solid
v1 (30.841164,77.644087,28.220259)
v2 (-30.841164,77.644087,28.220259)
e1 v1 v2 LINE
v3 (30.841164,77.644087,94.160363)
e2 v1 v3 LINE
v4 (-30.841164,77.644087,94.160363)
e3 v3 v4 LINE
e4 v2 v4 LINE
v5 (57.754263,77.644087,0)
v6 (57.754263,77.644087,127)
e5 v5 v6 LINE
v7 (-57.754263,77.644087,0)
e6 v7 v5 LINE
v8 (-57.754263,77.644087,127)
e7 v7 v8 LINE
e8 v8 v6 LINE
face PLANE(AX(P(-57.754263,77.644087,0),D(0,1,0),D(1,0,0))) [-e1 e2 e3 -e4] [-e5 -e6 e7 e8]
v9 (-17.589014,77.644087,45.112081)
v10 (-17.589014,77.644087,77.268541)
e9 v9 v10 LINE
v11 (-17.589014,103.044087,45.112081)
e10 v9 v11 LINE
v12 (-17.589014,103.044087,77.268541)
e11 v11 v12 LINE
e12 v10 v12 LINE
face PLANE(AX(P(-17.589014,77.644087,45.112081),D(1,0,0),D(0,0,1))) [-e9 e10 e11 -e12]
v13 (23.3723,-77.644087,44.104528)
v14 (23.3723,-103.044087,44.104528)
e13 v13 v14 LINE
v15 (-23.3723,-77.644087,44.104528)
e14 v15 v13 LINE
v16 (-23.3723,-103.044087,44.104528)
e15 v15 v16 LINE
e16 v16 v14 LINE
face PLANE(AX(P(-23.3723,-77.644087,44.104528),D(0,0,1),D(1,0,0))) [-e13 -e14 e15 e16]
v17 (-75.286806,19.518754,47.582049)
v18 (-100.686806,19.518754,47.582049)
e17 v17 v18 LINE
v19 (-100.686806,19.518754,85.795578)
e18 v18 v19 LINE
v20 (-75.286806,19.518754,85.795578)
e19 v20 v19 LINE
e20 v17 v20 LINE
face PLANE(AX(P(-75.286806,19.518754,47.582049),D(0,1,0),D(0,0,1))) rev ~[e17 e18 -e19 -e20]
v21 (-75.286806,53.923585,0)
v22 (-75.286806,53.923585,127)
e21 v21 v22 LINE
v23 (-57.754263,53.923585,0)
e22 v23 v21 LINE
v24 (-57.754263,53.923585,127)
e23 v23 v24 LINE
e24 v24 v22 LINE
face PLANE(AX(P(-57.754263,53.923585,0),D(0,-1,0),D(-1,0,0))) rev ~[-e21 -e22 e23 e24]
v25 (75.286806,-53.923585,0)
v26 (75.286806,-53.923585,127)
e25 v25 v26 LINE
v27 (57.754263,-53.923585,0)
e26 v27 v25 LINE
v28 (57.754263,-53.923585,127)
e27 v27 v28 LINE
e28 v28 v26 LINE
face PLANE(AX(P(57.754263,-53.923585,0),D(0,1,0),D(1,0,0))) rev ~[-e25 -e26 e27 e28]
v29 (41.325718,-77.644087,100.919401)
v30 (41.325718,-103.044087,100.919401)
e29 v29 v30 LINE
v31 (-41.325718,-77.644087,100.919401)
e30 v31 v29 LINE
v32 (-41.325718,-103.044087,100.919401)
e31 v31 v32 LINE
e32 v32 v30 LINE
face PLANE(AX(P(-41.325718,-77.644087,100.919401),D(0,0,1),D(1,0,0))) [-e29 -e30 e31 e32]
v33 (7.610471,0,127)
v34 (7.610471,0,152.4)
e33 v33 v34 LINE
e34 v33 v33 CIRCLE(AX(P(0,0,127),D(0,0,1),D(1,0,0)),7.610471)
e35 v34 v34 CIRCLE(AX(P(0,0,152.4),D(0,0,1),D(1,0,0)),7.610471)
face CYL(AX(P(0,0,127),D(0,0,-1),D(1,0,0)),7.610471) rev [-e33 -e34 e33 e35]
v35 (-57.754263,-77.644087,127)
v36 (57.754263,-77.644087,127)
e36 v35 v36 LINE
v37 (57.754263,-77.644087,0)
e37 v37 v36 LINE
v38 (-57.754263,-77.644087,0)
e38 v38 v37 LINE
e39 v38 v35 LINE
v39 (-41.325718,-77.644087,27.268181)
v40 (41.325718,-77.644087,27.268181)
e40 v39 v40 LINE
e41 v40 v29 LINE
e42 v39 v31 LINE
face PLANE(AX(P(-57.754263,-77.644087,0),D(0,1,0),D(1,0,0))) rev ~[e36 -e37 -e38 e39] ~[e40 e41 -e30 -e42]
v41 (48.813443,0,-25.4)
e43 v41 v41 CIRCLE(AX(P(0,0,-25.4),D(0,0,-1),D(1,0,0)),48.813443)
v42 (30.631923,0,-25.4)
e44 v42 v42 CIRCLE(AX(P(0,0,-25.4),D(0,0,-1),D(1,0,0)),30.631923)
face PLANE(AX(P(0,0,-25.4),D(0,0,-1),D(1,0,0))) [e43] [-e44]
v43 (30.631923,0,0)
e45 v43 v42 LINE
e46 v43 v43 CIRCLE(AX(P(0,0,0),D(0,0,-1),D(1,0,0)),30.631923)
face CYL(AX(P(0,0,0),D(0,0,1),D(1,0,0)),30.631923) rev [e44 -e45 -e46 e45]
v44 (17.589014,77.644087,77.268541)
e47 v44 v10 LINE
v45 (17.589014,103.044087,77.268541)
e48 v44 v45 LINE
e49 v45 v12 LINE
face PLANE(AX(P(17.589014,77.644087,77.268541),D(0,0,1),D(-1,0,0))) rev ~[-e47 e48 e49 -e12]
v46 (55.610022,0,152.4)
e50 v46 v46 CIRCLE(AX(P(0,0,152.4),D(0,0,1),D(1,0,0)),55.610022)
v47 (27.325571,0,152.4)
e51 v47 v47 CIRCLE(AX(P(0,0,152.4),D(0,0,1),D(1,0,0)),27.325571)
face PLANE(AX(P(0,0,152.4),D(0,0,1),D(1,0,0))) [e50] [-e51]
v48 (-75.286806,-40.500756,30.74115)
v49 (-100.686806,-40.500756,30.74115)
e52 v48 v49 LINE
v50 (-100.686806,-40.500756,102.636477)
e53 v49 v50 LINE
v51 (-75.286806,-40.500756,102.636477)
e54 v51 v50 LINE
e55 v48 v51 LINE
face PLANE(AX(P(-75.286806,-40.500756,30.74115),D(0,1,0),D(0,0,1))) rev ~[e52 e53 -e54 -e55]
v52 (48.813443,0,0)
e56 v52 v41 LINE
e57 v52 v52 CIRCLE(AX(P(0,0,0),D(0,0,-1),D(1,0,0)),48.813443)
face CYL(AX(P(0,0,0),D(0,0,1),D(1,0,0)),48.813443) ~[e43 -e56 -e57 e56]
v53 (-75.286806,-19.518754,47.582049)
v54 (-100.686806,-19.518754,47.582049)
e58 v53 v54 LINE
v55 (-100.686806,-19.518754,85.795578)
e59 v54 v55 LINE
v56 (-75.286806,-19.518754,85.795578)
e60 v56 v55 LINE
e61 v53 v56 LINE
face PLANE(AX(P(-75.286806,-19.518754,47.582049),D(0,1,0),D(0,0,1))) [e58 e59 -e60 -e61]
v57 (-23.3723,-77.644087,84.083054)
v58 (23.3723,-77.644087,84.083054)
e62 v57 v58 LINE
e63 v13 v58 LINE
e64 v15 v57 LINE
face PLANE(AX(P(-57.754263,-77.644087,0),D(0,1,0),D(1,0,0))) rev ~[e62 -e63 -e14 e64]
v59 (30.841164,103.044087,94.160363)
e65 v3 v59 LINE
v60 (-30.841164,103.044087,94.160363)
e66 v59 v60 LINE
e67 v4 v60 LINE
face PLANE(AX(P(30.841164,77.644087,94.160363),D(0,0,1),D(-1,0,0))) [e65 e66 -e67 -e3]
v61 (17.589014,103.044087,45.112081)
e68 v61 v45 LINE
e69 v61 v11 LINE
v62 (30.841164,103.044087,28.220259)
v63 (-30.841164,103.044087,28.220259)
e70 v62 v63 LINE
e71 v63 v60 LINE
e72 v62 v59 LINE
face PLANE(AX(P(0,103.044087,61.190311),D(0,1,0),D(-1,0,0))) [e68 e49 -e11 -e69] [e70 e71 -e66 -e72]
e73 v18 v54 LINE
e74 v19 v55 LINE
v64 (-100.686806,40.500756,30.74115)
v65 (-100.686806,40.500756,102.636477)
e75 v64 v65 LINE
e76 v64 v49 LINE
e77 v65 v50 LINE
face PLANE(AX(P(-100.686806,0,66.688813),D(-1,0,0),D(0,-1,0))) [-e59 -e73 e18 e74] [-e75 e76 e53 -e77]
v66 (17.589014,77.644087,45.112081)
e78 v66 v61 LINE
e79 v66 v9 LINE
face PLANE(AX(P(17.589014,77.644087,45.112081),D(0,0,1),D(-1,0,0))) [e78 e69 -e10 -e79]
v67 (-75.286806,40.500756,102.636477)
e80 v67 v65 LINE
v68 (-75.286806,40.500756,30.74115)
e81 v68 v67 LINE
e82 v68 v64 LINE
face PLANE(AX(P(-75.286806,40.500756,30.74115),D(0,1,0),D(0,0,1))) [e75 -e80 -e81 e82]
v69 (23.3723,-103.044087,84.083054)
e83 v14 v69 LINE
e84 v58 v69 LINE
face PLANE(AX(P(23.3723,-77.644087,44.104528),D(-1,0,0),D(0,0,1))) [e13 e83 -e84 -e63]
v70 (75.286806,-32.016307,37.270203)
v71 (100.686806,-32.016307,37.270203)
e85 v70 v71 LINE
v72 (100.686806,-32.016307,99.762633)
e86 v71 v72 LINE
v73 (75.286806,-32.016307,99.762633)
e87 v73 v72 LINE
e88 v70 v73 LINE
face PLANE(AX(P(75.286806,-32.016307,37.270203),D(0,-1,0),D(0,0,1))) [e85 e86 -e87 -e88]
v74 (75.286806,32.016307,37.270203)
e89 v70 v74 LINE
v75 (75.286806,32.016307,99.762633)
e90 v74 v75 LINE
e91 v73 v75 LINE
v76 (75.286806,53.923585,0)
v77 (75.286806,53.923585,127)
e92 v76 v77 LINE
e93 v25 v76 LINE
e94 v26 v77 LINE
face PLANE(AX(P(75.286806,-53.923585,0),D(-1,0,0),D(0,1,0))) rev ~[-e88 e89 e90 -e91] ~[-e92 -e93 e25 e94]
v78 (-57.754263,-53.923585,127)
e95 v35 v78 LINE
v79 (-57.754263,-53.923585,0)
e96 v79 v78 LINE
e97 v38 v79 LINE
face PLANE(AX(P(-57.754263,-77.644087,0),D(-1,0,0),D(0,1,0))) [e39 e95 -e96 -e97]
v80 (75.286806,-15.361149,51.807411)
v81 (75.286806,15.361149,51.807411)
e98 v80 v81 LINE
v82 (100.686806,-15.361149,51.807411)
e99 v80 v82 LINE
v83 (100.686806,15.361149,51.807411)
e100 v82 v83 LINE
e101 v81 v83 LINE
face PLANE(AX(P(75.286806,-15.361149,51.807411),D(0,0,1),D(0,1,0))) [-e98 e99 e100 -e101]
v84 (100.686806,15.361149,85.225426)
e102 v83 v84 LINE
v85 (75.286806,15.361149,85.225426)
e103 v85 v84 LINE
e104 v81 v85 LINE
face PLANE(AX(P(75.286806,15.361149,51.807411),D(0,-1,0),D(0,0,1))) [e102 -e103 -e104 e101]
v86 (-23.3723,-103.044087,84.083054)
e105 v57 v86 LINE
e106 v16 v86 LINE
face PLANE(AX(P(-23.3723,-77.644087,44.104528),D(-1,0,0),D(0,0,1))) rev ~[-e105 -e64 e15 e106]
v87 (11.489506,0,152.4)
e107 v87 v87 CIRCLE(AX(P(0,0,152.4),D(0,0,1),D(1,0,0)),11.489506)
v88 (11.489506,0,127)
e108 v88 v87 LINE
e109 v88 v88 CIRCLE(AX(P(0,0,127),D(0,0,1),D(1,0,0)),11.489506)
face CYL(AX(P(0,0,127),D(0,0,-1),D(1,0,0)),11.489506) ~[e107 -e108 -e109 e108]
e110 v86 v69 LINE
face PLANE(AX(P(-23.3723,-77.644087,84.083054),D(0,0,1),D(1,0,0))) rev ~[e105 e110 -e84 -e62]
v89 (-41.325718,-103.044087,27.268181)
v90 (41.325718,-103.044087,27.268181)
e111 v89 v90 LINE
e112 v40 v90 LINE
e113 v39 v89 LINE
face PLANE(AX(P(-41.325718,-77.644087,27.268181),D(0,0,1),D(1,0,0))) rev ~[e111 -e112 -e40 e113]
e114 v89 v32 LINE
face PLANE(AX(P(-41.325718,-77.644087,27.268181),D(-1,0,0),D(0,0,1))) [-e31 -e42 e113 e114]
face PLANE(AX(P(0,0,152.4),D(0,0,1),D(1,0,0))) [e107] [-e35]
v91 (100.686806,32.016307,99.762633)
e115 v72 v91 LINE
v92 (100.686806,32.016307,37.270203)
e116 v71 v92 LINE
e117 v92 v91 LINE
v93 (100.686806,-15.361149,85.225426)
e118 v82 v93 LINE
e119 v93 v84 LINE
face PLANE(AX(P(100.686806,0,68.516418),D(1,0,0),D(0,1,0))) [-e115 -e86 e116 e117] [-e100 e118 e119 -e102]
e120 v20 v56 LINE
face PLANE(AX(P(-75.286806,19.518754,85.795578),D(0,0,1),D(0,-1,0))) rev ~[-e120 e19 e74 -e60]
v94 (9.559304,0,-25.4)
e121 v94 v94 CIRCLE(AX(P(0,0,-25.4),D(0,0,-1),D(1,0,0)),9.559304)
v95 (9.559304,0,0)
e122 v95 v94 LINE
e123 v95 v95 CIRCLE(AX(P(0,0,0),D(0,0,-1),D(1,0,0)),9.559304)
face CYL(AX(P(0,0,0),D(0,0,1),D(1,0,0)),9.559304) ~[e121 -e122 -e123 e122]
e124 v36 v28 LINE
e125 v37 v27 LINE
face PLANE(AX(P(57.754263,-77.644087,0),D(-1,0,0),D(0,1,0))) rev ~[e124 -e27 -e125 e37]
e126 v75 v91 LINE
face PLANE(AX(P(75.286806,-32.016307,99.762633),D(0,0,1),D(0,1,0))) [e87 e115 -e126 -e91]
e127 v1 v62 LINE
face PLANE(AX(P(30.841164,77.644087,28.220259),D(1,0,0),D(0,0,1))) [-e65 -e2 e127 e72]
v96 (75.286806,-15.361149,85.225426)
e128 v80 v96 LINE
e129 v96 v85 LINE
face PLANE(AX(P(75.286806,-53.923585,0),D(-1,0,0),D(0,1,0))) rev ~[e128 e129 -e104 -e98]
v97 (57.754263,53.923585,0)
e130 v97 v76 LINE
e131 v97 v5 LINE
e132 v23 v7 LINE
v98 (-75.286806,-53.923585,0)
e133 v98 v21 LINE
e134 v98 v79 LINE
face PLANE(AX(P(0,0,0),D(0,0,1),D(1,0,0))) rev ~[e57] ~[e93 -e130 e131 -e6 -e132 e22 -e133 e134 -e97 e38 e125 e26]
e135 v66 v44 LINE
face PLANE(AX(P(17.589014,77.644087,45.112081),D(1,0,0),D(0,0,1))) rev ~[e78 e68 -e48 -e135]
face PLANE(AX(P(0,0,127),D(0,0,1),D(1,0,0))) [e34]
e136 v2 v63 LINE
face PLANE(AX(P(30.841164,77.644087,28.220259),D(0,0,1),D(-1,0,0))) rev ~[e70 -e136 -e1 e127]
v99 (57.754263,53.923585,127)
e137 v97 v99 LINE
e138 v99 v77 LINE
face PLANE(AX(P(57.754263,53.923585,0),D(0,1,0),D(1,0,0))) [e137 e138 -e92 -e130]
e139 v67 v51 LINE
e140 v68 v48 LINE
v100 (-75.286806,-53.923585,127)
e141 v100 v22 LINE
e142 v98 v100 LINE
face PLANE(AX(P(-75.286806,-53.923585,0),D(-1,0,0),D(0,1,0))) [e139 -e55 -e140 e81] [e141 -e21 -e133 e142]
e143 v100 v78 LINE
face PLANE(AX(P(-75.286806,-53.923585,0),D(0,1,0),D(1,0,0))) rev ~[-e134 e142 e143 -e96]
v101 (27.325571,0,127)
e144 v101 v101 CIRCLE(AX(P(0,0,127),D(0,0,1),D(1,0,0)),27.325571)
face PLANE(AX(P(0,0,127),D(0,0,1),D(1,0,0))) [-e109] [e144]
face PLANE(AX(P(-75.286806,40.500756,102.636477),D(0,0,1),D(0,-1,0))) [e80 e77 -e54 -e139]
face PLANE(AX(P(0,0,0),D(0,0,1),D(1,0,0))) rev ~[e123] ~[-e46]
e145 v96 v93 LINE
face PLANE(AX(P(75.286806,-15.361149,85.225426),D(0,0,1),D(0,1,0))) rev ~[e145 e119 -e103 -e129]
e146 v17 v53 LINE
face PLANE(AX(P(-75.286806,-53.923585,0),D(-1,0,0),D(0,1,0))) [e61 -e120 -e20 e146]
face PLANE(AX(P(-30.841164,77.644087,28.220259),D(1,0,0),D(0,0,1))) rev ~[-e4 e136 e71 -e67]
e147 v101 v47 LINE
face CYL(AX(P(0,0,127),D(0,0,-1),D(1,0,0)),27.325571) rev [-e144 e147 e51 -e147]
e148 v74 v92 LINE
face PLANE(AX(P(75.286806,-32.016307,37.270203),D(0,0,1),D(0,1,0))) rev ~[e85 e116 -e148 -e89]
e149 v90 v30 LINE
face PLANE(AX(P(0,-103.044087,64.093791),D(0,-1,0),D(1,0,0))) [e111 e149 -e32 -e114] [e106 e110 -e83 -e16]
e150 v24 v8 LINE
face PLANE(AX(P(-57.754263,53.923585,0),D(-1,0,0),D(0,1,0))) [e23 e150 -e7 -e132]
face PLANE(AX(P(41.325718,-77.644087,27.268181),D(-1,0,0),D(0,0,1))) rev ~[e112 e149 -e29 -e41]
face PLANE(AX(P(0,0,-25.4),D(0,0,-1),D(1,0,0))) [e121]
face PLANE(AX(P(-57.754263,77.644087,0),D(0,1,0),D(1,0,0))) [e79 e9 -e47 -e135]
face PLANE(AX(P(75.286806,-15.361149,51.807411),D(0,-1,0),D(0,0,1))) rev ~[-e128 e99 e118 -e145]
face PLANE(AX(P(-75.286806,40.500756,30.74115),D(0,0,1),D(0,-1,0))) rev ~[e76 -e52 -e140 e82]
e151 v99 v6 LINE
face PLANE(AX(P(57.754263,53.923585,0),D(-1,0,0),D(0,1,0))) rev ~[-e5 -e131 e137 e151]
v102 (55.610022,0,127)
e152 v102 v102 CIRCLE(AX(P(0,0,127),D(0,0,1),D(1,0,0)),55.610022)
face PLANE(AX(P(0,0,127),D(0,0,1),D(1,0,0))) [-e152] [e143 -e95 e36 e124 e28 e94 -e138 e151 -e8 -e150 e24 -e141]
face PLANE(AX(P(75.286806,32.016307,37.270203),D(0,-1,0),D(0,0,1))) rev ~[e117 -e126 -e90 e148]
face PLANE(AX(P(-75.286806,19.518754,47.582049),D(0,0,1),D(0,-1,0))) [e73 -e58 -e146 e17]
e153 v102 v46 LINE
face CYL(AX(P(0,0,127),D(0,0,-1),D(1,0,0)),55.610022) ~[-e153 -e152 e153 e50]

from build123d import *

# Parameters (mm, degrees)
F0_W      = 115.5085265636
F0_H      = 107.8471690416
F0_W_2    = 17.5325423479
F0_H_2    = 23.7205028534
F1_DEPTH  = 127
F2_R      = 55.6100218135
F2_R_2    = 41.4969022391
F2_R_3    = 27.3255706414
F2_R_4    = 11.4895056952
F2_R_5    = 7.610471178
F3_DEPTH  = 25.4
F4_W      = 64.0326142311
F4_H      = 62.4924302101
F4_W_2    = 30.7222977281
F4_H_2    = 33.4180146456
F5_DEPTH  = 25.4
F6_W      = 61.6823285818
F6_H      = 65.940104425
F6_W_2    = 35.1780280471
F6_H_2    = 32.1564599872
F7_DEPTH  = 25.4
F8_W      = 82.6514363289
F8_H      = 73.6512206495
F8_W_2    = 46.7445999384
F8_H_2    = 39.9785265326
F9_DEPTH  = 25.4
F10_W     = 81.0015127063
F10_H     = 71.895327419
F10_W_2   = 39.0375070274
F10_H_2   = 38.2135286927
F11_DEPTH = 25.4
F12_R     = 48.8134428036
F12_R_2   = 30.6319229548
F12_R_3   = 9.5593039908
F13_DEPTH = 25.4


with BuildPart() as f1:
    # F0 (on Top) → F1 (new body)
    with BuildSketch(Plane.XY):
        Rectangle(F0_W, F0_H)
        with Locations((-66.5205344558, 0)):
            Rectangle(F0_W_2, F0_H)
        with Locations((0, 65.7838359475)):
            Rectangle(F0_W, F0_H_2)
        with Locations((66.5205344558, 0)):
            Rectangle(F0_W_2, F0_H)
        with Locations((0, -65.7838359475)):
            Rectangle(F0_W, F0_H_2)
    extrude(amount=F1_DEPTH)

    # F2 (on face) → F3 (join)
    with BuildSketch(Plane.XY.offset(127)):
        Circle(F2_R)
        Circle(F2_R_2, mode=Mode.SUBTRACT)
        Circle(F2_R_2)
        Circle(F2_R_3, mode=Mode.SUBTRACT)
        Circle(F2_R_4)
        Circle(F2_R_5, mode=Mode.SUBTRACT)
    extrude(amount=F3_DEPTH)

    # F4 (on face) → F5 (join)
    with BuildSketch(Plane.YZ.offset(75.2868056297)):
        with Locations((0, 68.5164183378)):
            Rectangle(F4_W, F4_H)
        with Locations((0, 68.5164183378)):
            Rectangle(F4_W_2, F4_H_2, mode=Mode.SUBTRACT)
    extrude(amount=F5_DEPTH)

    # F6 (on face) → F7 (join)
    with BuildSketch(Plane(origin=(0, 77.6440873742, 0), x_dir=(-1, 0, 0), z_dir=(0, 1, 0))):
        with Locations((0, 61.1903108656)):
            Rectangle(F6_W, F6_H)
        with Locations((0, 61.1903108656)):
            Rectangle(F6_W_2, F6_H_2, mode=Mode.SUBTRACT)
    extrude(amount=F7_DEPTH)

    # F8 (on face) → F9 (join)
    with BuildSketch(Plane.XZ.offset(77.6440873742)):
        with Locations((0, 64.0937909484)):
            Rectangle(F8_W, F8_H)
        with Locations((0, 64.0937909484)):
            Rectangle(F8_W_2, F8_H_2, mode=Mode.SUBTRACT)
    extrude(amount=F9_DEPTH)

    # F10 (on face) → F11 (join)
    with BuildSketch(Plane(origin=(-75.2868056297, 0, 0), x_dir=(0, -1, 0), z_dir=(-1, 0, 0))):
        with Locations((0, 66.6888132691)):
            Rectangle(F10_W, F10_H)
        with Locations((0, 66.6888132691)):
            Rectangle(F10_W_2, F10_H_2, mode=Mode.SUBTRACT)
    extrude(amount=F11_DEPTH)

    # F12 (on face) → F13 (join)
    with BuildSketch(Plane(origin=(0, 0, 0), x_dir=(1, 0, 0), z_dir=(0, 0, -1))):
        Circle(F12_R)
        Circle(F12_R_2, mode=Mode.SUBTRACT)
        Circle(F12_R_3)
    extrude(amount=F13_DEPTH)


solid = f1.part
